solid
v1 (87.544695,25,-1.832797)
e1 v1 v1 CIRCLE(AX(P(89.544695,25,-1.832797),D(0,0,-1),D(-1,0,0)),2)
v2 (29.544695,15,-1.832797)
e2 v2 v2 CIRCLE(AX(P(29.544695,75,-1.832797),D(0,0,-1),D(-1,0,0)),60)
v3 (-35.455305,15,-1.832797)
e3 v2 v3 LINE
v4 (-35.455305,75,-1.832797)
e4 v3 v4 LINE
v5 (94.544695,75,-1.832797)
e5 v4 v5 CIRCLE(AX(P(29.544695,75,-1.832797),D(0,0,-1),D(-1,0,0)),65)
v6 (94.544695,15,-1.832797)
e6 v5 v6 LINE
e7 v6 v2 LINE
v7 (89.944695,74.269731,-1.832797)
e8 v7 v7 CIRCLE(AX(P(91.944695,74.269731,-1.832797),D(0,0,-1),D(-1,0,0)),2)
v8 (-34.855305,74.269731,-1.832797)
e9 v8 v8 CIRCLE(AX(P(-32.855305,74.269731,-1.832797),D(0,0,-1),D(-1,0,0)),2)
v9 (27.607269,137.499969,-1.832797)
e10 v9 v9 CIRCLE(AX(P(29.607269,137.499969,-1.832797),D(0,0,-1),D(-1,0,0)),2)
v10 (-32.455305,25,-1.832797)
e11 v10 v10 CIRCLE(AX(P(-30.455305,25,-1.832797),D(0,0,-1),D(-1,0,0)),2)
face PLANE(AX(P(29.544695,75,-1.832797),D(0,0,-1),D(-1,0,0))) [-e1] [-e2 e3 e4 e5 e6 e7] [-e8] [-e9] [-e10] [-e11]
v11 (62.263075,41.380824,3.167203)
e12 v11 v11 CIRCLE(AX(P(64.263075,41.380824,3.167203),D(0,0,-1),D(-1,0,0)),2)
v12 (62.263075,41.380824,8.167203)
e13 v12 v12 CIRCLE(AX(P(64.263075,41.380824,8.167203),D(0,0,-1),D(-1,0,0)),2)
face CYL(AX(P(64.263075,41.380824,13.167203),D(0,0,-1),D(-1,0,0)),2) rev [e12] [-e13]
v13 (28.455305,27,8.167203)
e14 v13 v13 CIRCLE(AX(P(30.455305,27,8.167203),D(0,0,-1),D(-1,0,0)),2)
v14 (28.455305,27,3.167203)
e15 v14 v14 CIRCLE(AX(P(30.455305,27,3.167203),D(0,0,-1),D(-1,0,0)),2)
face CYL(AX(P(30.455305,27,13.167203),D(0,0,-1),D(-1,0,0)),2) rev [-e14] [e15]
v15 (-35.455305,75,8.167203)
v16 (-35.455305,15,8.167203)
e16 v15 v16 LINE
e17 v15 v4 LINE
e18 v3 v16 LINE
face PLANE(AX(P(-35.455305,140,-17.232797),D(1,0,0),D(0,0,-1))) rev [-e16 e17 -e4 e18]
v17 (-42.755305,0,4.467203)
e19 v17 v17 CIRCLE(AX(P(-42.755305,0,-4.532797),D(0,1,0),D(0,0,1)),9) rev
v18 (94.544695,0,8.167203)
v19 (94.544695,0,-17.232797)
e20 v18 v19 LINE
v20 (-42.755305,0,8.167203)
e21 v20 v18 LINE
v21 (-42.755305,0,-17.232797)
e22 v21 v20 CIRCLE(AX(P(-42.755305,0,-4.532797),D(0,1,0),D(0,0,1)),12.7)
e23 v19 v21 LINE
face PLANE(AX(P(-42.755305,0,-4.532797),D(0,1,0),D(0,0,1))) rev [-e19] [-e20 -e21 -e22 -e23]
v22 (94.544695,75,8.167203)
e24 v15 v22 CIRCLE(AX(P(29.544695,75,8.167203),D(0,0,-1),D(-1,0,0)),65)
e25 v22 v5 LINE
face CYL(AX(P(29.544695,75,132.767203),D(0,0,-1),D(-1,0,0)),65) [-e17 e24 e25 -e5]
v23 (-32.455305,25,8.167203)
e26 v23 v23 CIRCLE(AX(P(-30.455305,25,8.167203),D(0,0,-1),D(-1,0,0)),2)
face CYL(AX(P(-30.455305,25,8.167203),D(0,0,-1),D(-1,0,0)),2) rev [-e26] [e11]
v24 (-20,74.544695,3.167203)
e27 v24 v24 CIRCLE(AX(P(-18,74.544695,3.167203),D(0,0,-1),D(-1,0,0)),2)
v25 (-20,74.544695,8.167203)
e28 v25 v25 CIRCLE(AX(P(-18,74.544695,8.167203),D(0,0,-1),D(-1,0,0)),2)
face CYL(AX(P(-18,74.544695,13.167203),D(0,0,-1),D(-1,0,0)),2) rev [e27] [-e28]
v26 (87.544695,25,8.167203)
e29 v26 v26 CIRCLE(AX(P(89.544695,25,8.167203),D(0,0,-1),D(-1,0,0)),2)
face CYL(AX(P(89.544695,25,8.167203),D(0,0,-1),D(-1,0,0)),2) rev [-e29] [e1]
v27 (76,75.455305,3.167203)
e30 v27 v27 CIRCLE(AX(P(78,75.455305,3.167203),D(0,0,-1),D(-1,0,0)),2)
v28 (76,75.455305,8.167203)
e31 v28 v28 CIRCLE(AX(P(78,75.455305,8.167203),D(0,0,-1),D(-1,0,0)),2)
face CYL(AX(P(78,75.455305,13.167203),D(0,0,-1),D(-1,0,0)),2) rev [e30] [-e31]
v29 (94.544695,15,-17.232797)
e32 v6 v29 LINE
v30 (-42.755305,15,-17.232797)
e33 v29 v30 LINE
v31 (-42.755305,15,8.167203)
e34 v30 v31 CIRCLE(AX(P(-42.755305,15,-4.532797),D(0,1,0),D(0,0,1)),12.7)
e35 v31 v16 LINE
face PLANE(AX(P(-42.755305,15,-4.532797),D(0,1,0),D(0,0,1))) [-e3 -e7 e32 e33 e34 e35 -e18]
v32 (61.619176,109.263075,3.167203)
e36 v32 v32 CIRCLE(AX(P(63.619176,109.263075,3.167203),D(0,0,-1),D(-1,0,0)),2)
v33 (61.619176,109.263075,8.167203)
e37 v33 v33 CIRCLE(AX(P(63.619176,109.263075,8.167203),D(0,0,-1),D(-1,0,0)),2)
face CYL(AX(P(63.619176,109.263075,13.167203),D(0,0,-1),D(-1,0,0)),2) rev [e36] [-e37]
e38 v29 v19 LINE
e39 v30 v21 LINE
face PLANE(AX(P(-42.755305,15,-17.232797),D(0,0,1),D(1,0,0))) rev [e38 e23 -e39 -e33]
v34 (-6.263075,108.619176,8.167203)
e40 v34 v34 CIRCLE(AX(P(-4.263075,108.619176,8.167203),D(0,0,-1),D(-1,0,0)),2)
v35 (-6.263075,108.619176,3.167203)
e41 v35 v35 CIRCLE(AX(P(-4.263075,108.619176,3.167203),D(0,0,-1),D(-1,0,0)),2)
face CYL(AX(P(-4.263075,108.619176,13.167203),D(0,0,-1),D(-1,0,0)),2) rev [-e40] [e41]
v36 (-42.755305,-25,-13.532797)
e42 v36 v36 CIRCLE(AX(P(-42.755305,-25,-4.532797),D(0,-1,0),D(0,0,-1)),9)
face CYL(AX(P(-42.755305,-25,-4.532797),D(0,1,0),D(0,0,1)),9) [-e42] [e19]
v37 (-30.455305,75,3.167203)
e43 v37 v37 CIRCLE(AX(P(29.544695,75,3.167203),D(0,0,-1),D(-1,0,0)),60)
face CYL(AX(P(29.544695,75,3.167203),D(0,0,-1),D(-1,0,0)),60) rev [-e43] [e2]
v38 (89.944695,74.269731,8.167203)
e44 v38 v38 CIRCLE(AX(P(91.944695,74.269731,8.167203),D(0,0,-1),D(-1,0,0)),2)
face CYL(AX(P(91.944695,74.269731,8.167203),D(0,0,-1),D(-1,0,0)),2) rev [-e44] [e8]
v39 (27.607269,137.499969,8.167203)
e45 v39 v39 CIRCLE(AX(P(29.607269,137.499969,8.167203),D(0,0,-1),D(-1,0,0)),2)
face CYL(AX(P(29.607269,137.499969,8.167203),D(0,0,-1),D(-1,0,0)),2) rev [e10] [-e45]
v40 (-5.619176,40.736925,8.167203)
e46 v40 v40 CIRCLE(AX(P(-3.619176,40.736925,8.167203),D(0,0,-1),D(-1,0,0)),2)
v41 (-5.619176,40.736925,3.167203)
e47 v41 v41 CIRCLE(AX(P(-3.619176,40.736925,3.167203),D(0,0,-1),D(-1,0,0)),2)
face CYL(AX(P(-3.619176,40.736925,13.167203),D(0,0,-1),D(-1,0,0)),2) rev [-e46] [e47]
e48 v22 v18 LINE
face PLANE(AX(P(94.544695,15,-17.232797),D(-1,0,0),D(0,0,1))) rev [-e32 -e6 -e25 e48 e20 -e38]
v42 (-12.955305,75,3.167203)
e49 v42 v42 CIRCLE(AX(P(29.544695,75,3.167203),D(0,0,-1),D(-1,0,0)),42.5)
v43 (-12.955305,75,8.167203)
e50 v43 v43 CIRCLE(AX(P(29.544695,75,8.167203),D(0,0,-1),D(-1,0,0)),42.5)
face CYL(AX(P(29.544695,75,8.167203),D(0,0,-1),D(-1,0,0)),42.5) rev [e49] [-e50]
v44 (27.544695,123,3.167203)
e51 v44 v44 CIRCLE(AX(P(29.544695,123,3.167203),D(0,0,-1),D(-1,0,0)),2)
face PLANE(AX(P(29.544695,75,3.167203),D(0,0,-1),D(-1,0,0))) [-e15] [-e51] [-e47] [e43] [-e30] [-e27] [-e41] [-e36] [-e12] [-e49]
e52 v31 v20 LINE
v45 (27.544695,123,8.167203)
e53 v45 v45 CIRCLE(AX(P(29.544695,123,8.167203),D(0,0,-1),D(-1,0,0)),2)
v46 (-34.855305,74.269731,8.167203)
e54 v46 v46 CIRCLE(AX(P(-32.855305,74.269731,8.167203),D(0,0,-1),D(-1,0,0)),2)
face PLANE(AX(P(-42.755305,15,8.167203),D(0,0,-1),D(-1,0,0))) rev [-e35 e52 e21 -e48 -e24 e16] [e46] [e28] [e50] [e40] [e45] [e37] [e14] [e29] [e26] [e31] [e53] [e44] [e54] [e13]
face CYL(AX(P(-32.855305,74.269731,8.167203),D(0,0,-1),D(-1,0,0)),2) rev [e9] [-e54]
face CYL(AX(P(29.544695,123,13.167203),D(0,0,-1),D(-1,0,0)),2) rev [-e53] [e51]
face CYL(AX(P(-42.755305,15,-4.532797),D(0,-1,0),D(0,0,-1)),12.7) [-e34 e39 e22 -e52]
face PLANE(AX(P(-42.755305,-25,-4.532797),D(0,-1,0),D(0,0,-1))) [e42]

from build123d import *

# Parameters (mm, degrees)
BOSS_EXTRUDE1_DEPTH = 15
SKETCH2_R           = 9
BOSS_EXTRUDE2_DEPTH = 25
SKETCH3_W           = 130
SKETCH3_H           = 25.4
BOSS_EXTRUDE4_DEPTH = 125
CUT_EXTRUDE5_DEPTH  = 150
CUT_EXTRUDE6_DEPTH  = 15.4
SKETCH10_R          = 60
CUT_EXTRUDE9_DEPTH  = 5
SKETCH11_R          = 42.5
CUT_EXTRUDE10_DEPTH = 5
SKETCH12_R          = 2
CUT_EXTRUDE11_DEPTH = 10
SKETCH13_R          = 2
CUT_EXTRUDE12_DEPTH = 10
SKETCH14_R          = 2
CUT_EXTRUDE13_DEPTH = 10
SKETCH15_R          = 2
CUT_EXTRUDE14_DEPTH = 10


with BuildPart() as part:
    # Sketch1 → Boss-Extrude1 (new body)
    with BuildSketch(Plane(origin=(0, 0, 0), x_dir=(1, 0, 0), z_dir=(0, 1, 0))):
        with BuildLine():
            Line((-42.755305466, 17.232797428), (94.544694534, 17.232797428))
            Line((94.544694534, 17.232797428), (94.544694534, -8.167202572))
            Line((94.544694534, -8.167202572), (-42.755305466, -8.167202572))
            ThreePointArc((-42.755305466, -8.167202572), (-55.455305466, 4.532797428), (-42.755305466, 17.232797428))
        make_face()
    extrude(amount=BOSS_EXTRUDE1_DEPTH)

    # Sketch2 → Boss-Extrude2 (add)
    with BuildSketch(Plane.XZ):
        with Locations((-42.755305466, -4.532797428)):
            Circle(SKETCH2_R)
    extrude(amount=BOSS_EXTRUDE2_DEPTH)

    # Sketch3 → Boss-Extrude4 (add)
    with BuildSketch(Plane(origin=(0, 15, 0), x_dir=(1, 0, 0), z_dir=(0, 1, 0))):
        with Locations((29.544694534, 4.532797428)):
            Rectangle(SKETCH3_W, SKETCH3_H)
    extrude(amount=BOSS_EXTRUDE4_DEPTH)

    # Sketch6 → Cut-Extrude5 (cut)
    with BuildSketch(Plane(origin=(0, 0, -17.232797428), x_dir=(-1, 0, 0), z_dir=(0, 0, -1))):
        with BuildLine():
            Line((35.455305466, 140), (-29.544695, 140))
            ThreePointArc((-29.544695, 140), (16.417246079, 120.961940942), (35.455305466, 75))
            Line((35.455305466, 75), (35.455305466, 140))
        make_face()
        with BuildLine():
            Line((-29.544695, 140), (-94.544694534, 140))
            Line((-94.544694534, 140), (-94.544694534, 75))
            ThreePointArc((-94.544694534, 75), (-75.506635476, 120.961940612), (-29.544695, 140))
        make_face()
    extrude(amount=-CUT_EXTRUDE5_DEPTH, mode=Mode.SUBTRACT)

    # Sketch9 → Cut-Extrude6 (cut)
    with BuildSketch(Plane(origin=(0, 0, -17.232797428), x_dir=(-1, 0, 0), z_dir=(0, 0, -1))):
        with BuildLine():
            Line((35.455305466, 15), (-94.544694534, 15))
            Line((-94.544694534, 15), (-94.544694534, 75))
            ThreePointArc((-94.544694534, 75), (-29.544694534, 140), (35.455305466, 75))
            Line((35.455305466, 75), (35.455305466, 15))
        make_face()
    extrude(amount=-CUT_EXTRUDE6_DEPTH, mode=Mode.SUBTRACT)

    # Sketch10 → Cut-Extrude9 (cut)
    with BuildSketch(Plane(origin=(0, 0, -1.832797428), x_dir=(-1, 0, 0), z_dir=(0, 0, -1))):
        with Locations((-29.544694534, 75)):
            Circle(SKETCH10_R)
    extrude(amount=-CUT_EXTRUDE9_DEPTH, mode=Mode.SUBTRACT)

    # Sketch11 → Cut-Extrude10 (cut)
    with BuildSketch(Plane(origin=(0, 0, 3.167202572), x_dir=(-1, 0, 0), z_dir=(0, 0, -1))):
        with Locations((-29.544694534, 75)):
            Circle(SKETCH11_R)
    extrude(amount=-CUT_EXTRUDE10_DEPTH, mode=Mode.SUBTRACT)

    # Sketch12 → Cut-Extrude11 (cut)
    with BuildSketch(Plane(origin=(0, 0, 3.167202572), x_dir=(-1, 0, 0), z_dir=(0, 0, -1))):
        with Locations((-29.544694534, 123)):
            Circle(SKETCH12_R)
        with Locations((4.26307508, 108.619175914)):
            Circle(SKETCH12_R)
        with Locations((18, 74.544694534)):
            Circle(SKETCH12_R)
        with Locations((3.619175914, 40.73692492)):
            Circle(SKETCH12_R)
        with Locations((-30.455305466, 27)):
            Circle(SKETCH12_R)
        with Locations((-64.26307508, 41.380824086)):
            Circle(SKETCH12_R)
        with Locations((-78, 75.455305466)):
            Circle(SKETCH12_R)
        with Locations((-63.619175914, 109.26307508)):
            Circle(SKETCH12_R)
    extrude(amount=-CUT_EXTRUDE11_DEPTH, mode=Mode.SUBTRACT)

    # Sketch13 → Cut-Extrude12 (cut)
    with BuildSketch(Plane(origin=(0, 0, -1.832797428), x_dir=(-1, 0, 0), z_dir=(0, 0, -1))):
        with Locations((-89.544694534, 25)):
            Circle(SKETCH13_R)
        with Locations((30.455305466, 25)):
            Circle(SKETCH13_R)
    extrude(amount=-CUT_EXTRUDE12_DEPTH, mode=Mode.SUBTRACT)

    # Sketch14 → Cut-Extrude13 (cut)
    with BuildSketch(Plane(origin=(0, 0, -1.832797428), x_dir=(-1, 0, 0), z_dir=(0, 0, -1))):
        with Locations((-91.944694534, 74.269730636)):
            Circle(SKETCH14_R)
        with Locations((32.855305466, 74.269730636)):
            Circle(SKETCH14_R)
    extrude(amount=-CUT_EXTRUDE13_DEPTH, mode=Mode.SUBTRACT)

    # Sketch15 → Cut-Extrude14 (cut)
    with BuildSketch(Plane(origin=(0, 0, -1.832797428), x_dir=(-1, 0, 0), z_dir=(0, 0, -1))):
        with Locations((-29.607268832, 137.499968676)):
            Circle(SKETCH15_R)
    extrude(amount=-CUT_EXTRUDE14_DEPTH, mode=Mode.SUBTRACT)


solid = part.part
